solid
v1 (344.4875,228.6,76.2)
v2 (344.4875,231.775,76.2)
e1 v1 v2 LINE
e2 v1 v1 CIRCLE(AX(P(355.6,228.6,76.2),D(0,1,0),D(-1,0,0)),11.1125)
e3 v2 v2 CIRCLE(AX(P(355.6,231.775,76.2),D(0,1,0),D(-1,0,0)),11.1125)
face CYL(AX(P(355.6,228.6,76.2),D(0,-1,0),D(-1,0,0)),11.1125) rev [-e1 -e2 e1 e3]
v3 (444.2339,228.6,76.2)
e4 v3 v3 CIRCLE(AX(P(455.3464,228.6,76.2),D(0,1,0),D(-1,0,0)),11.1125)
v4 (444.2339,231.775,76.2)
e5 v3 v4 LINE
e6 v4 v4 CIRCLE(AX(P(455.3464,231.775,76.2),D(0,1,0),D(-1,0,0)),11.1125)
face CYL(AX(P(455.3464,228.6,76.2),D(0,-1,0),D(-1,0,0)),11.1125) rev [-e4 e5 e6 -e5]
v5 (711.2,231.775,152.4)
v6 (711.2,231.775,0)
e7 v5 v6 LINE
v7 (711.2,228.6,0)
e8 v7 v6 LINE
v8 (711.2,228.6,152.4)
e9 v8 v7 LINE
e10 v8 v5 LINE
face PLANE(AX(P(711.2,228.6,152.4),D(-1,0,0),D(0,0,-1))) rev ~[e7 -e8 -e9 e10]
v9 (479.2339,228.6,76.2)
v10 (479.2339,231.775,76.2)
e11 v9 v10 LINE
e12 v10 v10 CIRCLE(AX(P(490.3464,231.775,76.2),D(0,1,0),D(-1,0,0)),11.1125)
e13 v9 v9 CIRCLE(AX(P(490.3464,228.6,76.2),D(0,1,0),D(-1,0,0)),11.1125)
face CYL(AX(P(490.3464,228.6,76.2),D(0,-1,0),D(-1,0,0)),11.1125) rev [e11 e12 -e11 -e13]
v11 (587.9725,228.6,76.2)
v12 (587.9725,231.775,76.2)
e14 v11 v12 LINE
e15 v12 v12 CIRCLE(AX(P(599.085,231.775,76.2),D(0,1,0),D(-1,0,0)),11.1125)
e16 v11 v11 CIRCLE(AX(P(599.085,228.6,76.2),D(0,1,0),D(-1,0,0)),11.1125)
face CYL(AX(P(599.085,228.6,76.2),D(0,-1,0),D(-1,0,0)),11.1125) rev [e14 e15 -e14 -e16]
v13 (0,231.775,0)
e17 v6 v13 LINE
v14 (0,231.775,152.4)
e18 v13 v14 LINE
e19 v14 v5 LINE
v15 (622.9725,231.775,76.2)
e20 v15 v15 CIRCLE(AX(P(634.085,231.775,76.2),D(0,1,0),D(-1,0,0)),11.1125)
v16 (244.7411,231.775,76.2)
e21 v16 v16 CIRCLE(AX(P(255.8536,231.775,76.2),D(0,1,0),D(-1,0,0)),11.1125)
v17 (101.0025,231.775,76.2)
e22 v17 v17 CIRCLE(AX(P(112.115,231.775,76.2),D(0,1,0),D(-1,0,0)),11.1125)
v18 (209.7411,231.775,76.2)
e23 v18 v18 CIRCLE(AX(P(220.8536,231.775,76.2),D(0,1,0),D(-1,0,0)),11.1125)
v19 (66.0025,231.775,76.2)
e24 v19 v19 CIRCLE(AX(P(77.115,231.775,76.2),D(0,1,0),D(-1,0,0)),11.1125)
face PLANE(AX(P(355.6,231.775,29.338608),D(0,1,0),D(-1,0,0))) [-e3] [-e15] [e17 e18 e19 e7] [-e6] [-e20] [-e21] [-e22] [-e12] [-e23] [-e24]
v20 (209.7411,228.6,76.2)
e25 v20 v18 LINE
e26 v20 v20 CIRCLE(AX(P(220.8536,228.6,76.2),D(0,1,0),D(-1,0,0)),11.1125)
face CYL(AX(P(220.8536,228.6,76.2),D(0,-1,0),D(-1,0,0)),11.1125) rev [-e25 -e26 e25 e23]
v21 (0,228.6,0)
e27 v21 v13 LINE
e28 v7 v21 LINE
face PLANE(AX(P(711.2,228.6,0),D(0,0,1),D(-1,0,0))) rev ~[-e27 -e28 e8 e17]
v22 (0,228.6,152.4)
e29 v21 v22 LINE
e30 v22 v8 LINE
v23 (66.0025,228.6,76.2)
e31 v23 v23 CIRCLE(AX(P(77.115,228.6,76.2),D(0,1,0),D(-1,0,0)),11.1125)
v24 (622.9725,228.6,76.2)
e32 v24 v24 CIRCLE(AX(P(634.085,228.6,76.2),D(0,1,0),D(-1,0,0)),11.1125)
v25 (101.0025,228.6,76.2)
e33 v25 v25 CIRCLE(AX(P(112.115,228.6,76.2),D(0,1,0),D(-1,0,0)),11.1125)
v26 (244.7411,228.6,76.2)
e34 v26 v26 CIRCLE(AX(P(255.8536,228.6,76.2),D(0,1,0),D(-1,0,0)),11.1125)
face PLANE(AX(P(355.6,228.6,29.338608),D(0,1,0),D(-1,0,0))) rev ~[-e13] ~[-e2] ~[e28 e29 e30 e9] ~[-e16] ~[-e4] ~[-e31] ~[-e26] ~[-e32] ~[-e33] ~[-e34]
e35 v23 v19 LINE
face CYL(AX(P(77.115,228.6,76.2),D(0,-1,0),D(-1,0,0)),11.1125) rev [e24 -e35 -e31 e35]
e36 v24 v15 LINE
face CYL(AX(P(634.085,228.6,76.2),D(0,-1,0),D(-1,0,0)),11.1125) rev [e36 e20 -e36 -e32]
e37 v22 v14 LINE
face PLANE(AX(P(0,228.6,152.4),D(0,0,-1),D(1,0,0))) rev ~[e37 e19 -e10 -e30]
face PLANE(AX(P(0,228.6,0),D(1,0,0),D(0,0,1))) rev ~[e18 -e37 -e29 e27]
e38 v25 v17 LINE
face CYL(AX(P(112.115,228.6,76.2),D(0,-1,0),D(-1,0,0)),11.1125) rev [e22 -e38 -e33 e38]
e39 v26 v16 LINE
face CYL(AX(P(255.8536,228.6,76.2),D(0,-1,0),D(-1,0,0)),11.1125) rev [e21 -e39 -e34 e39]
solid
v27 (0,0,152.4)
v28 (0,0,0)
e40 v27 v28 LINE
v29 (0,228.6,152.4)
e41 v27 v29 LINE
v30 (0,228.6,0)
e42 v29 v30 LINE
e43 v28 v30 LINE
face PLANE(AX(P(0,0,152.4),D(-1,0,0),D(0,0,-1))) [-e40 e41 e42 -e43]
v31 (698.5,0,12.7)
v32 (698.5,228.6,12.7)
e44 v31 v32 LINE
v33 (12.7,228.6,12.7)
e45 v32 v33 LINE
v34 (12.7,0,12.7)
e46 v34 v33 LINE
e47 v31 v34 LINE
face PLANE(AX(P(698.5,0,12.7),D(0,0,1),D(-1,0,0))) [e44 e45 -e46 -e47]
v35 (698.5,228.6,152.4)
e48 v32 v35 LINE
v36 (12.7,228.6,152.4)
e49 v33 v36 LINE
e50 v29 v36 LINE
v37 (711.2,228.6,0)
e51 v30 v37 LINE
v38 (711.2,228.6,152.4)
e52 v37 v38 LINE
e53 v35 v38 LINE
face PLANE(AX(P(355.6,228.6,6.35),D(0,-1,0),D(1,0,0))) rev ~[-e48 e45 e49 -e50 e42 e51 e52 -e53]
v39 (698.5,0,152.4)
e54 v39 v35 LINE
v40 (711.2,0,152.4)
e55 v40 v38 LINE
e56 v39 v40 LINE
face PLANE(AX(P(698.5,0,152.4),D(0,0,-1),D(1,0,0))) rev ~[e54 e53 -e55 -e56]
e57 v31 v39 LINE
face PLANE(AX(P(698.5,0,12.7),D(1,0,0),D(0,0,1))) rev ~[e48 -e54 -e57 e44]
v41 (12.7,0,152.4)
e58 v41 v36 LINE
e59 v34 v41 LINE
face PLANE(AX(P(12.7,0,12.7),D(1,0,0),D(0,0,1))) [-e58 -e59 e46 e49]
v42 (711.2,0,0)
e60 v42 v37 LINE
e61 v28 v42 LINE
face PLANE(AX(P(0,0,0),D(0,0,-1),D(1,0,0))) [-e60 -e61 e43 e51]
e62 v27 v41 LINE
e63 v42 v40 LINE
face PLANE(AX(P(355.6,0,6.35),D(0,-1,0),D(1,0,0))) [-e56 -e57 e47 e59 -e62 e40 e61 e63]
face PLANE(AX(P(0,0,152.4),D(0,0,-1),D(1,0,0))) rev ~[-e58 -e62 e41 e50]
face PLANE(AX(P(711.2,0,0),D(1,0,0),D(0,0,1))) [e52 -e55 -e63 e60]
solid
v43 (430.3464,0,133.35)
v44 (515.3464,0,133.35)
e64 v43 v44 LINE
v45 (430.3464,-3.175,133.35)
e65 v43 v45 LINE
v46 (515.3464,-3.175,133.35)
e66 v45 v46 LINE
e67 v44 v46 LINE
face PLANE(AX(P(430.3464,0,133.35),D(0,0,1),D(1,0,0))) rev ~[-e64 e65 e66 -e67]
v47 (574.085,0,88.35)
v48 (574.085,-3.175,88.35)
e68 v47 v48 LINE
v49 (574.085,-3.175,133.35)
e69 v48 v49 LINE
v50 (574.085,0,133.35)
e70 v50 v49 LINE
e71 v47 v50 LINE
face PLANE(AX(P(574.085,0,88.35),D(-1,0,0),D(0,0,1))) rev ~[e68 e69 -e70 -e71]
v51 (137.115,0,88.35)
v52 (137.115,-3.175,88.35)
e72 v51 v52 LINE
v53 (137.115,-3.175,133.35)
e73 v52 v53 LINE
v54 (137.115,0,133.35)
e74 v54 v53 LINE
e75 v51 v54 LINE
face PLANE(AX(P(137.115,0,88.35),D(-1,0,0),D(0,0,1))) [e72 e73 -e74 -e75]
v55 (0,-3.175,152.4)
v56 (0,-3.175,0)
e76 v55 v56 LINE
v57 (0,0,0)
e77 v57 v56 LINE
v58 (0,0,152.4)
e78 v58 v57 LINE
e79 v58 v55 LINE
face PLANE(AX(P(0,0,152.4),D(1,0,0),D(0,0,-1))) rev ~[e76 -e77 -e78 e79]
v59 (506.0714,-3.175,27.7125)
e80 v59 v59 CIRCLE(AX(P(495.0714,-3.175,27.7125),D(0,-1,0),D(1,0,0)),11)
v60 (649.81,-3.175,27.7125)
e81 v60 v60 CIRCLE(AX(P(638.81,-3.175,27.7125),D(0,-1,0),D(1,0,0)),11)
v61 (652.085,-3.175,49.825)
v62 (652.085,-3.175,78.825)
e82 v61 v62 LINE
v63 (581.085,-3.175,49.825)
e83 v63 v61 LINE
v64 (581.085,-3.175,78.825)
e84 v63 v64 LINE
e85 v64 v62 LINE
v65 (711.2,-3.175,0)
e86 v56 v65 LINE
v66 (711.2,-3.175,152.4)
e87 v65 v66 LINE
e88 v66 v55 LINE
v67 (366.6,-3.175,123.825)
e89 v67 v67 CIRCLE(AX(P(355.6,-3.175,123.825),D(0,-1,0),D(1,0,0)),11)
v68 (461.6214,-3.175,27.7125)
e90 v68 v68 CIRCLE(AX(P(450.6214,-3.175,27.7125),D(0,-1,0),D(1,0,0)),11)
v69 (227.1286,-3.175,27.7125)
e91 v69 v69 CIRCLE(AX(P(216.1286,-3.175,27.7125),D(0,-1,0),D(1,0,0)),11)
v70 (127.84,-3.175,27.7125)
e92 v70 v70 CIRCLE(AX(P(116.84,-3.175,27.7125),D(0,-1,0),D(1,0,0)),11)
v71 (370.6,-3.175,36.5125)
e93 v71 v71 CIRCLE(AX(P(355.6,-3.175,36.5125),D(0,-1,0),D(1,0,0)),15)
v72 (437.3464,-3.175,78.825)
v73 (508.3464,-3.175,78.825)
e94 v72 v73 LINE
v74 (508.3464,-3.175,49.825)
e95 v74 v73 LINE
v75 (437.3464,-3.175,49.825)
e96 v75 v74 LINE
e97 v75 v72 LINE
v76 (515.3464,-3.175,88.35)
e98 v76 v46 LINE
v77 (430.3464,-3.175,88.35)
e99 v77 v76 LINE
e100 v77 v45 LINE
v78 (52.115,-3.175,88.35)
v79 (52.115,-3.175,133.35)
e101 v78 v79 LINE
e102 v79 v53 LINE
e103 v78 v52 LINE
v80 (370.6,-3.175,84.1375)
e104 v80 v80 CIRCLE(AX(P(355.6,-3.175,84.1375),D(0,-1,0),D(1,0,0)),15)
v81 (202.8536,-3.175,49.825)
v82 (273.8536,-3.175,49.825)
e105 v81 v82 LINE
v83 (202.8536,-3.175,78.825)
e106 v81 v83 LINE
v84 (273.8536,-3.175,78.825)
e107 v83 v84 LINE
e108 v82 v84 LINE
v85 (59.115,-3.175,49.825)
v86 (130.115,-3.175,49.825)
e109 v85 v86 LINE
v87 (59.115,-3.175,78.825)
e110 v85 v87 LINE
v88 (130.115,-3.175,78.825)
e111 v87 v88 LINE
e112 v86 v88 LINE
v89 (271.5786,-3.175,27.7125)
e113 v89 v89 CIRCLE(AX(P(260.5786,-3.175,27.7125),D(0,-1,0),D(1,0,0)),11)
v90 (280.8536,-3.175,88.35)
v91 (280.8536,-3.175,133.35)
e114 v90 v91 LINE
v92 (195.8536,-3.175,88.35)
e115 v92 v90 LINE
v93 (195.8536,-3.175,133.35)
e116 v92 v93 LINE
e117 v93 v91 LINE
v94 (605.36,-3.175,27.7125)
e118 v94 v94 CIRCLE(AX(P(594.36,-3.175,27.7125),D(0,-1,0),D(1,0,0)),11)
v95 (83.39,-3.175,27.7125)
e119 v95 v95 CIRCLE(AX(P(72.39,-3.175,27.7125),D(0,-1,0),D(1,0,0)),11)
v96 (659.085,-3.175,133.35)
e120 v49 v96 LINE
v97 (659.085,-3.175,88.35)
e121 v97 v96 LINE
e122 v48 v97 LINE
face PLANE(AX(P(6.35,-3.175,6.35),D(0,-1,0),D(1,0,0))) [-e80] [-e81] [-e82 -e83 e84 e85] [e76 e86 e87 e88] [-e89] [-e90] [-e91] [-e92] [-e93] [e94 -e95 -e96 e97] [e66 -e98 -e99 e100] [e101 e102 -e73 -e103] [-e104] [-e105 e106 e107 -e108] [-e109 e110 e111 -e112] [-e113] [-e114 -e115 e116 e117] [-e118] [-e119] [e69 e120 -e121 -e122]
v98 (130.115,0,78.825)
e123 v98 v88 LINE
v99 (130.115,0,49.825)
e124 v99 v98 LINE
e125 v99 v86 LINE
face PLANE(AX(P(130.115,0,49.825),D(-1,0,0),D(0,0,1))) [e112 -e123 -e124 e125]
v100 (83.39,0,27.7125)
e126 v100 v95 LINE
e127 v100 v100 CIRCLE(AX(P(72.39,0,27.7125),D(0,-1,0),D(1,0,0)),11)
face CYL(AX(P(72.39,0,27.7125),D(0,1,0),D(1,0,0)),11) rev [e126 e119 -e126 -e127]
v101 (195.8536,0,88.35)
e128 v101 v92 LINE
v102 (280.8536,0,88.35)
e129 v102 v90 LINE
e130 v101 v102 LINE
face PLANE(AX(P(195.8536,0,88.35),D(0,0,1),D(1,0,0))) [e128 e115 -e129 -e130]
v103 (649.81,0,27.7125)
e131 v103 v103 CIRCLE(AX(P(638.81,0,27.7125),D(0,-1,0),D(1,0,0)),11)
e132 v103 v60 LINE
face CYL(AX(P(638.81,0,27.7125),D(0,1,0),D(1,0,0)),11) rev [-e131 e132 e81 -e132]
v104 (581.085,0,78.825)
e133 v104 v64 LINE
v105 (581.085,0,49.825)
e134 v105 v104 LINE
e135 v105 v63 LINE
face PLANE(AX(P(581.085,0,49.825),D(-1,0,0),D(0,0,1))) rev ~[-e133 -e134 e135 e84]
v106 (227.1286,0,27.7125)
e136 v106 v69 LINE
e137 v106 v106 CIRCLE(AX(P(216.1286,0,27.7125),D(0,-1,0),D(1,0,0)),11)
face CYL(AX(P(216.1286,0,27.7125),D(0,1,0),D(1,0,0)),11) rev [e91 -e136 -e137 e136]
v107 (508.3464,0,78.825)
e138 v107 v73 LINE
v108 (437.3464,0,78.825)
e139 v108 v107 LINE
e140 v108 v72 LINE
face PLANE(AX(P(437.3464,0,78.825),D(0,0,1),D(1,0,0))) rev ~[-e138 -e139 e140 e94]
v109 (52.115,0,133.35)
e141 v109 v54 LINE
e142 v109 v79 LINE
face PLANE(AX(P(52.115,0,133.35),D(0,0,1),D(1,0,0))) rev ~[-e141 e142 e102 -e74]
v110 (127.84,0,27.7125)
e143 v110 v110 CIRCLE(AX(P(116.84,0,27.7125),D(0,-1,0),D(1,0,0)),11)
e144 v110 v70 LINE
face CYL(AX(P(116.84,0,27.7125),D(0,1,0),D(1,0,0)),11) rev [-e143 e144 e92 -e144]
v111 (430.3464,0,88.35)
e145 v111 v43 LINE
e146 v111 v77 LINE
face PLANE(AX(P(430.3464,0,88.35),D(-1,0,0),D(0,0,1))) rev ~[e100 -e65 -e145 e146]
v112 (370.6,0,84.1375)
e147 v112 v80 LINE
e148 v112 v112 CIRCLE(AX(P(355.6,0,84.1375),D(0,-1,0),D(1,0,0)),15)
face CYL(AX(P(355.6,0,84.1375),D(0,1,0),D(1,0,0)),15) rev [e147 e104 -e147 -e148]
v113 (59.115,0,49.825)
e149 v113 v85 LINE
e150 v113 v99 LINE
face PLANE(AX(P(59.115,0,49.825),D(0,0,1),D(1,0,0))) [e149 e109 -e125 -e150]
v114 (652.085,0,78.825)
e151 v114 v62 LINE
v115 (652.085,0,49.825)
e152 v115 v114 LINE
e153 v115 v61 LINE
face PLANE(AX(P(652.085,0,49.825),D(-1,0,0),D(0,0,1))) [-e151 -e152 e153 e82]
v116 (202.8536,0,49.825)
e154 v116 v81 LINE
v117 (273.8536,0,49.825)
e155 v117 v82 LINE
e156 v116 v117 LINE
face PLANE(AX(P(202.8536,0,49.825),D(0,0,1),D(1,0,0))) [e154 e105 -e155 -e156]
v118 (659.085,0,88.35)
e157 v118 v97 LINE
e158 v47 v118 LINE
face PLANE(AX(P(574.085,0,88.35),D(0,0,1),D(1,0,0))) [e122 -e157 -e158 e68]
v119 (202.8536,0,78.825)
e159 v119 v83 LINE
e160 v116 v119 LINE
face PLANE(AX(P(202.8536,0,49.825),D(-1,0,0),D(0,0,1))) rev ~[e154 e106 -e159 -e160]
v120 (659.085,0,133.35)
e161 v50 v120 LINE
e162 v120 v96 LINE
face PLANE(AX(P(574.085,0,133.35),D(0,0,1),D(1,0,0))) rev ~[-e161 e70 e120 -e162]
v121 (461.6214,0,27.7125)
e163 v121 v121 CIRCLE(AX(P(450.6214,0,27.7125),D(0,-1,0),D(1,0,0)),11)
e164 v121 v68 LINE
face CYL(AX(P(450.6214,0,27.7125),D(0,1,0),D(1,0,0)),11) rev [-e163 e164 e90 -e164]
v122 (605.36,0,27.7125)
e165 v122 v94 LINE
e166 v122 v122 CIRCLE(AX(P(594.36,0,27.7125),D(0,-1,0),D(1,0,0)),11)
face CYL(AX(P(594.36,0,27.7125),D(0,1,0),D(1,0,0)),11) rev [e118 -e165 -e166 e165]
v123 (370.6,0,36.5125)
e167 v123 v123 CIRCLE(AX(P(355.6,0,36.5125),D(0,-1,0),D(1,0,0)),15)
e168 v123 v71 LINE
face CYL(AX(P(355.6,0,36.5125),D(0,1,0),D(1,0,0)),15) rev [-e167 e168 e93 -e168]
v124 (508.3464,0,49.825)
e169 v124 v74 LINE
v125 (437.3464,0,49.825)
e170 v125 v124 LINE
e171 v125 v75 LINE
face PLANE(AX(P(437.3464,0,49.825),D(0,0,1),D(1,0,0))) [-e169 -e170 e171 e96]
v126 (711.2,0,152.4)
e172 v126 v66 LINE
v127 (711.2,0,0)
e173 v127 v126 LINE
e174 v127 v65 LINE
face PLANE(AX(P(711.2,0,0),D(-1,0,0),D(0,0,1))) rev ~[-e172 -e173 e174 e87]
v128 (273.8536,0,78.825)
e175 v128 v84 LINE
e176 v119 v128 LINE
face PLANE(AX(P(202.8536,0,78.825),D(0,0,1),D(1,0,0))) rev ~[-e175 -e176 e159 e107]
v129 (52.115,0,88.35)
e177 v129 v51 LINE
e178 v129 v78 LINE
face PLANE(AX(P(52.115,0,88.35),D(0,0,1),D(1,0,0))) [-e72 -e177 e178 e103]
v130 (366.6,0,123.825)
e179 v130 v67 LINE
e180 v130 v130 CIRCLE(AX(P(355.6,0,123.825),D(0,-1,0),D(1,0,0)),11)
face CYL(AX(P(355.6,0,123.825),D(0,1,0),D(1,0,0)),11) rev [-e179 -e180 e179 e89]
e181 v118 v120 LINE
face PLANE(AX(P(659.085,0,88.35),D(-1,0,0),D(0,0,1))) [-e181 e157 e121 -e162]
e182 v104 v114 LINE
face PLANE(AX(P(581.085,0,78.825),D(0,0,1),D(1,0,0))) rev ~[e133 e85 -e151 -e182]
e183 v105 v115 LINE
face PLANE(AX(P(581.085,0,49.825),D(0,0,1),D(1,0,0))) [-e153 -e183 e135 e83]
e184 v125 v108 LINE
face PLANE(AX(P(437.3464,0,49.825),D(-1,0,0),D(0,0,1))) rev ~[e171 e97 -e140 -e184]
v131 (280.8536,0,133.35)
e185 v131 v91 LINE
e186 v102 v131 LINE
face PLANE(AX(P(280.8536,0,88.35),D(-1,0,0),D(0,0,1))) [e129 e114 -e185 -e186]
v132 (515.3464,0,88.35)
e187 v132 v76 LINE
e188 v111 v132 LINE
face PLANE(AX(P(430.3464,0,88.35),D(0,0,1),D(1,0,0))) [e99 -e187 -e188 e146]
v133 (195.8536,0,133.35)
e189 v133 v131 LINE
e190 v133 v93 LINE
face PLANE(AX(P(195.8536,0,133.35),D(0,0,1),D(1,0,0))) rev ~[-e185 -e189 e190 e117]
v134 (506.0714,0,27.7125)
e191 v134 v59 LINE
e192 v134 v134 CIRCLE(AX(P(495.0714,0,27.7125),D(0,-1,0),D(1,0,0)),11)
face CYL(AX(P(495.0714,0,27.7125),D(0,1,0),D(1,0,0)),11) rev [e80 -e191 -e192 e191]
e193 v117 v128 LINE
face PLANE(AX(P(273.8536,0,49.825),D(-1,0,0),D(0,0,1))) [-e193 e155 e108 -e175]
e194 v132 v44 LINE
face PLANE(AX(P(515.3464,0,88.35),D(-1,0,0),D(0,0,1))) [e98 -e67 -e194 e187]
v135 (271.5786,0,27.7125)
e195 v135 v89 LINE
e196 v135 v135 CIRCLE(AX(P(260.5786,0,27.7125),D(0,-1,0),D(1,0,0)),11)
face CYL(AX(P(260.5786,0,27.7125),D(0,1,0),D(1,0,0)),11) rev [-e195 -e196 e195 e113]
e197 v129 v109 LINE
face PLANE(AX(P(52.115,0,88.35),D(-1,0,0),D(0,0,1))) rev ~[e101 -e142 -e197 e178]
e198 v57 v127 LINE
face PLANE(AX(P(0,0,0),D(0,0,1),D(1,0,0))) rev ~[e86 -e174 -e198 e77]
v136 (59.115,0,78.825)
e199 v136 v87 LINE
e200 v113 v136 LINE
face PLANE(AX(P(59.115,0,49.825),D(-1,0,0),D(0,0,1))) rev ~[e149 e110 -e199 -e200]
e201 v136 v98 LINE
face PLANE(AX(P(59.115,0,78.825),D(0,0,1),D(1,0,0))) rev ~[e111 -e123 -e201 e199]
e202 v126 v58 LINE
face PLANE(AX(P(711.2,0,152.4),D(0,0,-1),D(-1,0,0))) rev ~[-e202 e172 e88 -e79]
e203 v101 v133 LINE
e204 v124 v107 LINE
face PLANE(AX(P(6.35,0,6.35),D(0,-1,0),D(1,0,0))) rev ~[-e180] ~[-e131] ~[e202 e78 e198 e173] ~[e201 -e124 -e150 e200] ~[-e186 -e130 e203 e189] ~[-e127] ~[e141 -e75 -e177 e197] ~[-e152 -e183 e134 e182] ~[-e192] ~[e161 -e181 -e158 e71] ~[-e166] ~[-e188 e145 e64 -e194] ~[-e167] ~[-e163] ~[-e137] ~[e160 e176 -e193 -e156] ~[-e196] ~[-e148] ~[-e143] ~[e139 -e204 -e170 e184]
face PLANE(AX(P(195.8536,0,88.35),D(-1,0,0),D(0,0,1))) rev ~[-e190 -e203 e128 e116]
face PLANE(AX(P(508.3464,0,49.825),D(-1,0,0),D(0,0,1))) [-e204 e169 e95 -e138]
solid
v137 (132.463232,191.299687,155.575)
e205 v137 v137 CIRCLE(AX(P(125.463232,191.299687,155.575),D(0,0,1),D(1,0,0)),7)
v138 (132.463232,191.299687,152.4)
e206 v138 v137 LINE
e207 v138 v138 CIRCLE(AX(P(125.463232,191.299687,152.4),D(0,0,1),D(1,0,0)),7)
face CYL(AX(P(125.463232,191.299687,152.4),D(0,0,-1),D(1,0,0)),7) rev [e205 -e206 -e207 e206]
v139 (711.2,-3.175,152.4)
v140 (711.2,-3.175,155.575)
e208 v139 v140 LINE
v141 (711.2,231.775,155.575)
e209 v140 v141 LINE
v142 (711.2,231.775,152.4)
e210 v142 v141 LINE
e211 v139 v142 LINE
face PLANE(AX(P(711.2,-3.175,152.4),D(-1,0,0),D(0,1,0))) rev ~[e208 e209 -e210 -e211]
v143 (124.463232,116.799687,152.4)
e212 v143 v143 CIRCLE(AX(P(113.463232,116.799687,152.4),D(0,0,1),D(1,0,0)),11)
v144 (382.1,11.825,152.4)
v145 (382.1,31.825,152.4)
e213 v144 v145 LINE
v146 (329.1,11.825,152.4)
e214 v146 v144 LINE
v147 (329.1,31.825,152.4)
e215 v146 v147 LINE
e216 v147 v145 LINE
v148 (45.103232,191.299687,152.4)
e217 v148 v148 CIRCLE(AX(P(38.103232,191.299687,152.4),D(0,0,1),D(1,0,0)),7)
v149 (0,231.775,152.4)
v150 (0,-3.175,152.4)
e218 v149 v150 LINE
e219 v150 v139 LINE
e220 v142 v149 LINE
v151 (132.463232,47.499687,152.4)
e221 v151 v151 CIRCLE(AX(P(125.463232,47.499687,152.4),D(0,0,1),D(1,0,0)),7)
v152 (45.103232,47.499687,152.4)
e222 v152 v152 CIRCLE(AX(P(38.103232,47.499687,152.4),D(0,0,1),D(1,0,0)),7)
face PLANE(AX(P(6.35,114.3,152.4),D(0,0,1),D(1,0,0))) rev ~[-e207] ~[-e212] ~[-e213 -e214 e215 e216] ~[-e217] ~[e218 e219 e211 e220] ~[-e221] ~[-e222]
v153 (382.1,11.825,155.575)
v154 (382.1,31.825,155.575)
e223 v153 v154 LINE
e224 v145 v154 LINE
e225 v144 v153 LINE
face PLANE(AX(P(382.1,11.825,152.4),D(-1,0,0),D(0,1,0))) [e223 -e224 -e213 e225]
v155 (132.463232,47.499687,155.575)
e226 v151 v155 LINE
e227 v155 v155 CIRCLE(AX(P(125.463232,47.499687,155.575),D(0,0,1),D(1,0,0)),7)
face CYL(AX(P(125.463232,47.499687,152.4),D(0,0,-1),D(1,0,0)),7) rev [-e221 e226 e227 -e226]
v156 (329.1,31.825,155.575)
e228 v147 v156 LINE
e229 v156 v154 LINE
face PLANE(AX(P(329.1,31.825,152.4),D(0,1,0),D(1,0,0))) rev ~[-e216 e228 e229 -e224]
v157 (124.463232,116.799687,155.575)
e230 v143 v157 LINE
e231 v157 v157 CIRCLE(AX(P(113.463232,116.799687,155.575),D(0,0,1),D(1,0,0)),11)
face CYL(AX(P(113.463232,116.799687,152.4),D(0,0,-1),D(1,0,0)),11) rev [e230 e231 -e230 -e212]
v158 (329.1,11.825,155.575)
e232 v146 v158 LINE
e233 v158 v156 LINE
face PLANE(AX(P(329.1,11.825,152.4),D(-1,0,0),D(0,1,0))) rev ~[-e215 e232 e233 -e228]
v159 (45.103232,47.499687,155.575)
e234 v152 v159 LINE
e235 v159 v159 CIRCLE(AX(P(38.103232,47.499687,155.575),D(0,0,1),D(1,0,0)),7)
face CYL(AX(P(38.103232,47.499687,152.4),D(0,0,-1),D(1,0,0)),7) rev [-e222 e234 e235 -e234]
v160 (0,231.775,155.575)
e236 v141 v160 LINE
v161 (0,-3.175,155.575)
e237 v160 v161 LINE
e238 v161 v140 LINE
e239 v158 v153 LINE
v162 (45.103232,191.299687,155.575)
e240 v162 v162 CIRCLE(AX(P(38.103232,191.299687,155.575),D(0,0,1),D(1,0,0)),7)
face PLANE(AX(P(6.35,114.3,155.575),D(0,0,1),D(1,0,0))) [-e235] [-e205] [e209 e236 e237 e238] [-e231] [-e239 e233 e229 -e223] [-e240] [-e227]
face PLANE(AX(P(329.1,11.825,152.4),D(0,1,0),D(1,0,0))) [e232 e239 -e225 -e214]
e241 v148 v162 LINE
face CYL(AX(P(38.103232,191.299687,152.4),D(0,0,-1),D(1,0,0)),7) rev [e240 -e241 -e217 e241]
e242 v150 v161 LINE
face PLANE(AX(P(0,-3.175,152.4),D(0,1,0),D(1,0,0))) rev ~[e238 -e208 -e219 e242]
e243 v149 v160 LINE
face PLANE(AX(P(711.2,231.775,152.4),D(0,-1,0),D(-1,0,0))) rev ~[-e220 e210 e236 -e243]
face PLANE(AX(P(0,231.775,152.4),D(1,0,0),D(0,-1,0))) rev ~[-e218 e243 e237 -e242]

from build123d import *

# Parameters (mm, degrees)
F0_W     = 12.7
F0_H     = 12.7
F0_W_2   = 685.8
F0_H_2   = 139.7
F0_R     = 11
F0_W_3   = 71
F0_H_3   = 29
F0_R_2   = 15
F0_W_4   = 85
F0_H_4   = 45
F1_DEPTH = 3.175
F2_DEPTH = 228.6
F3_W     = 685.8
F3_H     = 139.7
F3_R     = 11.1125
F4_DEPTH = 3.175
F5_W     = 12.7
F5_H     = 228.6
F5_R     = 7
F5_W_2   = 53
F5_H_2   = 20
F5_R_2   = 11
F6_DEPTH = 3.175


# Not quite as in the source:
# - a feature names something its author has since deleted; it is built from what else it names


with BuildPart() as f1:
    # F0 (on Front) → F1 (new body)
    with BuildSketch(Plane.XZ):
        with Locations((6.35, 6.35)):
            Rectangle(F0_W, F0_H)
        with Locations((355.6, 6.35)):
            Rectangle(F0_W_2, F0_H)
        with Locations((704.85, 6.35)):
            Rectangle(F0_W, F0_H)
        with Locations((6.35, 82.55)):
            Rectangle(F0_W, F0_H_2)
        with Locations((355.6, 82.55)):
            Rectangle(F0_W_2, F0_H_2)
        with Locations((72.39, 27.7125)):
            Circle(F0_R, mode=Mode.SUBTRACT)
        with Locations((116.84, 27.7125)):
            Circle(F0_R, mode=Mode.SUBTRACT)
        with Locations((216.1286, 27.7125)):
            Circle(F0_R, mode=Mode.SUBTRACT)
        with Locations((260.5786, 27.7125)):
            Circle(F0_R, mode=Mode.SUBTRACT)
        with Locations((94.615, 64.325)):
            Rectangle(F0_W_3, F0_H_3, mode=Mode.SUBTRACT)
        with Locations((238.3536, 64.325)):
            Rectangle(F0_W_3, F0_H_3, mode=Mode.SUBTRACT)
        with Locations((355.6, 36.5125)):
            Circle(F0_R_2, mode=Mode.SUBTRACT)
        with Locations((450.6214, 27.7125)):
            Circle(F0_R, mode=Mode.SUBTRACT)
        with Locations((495.0714, 27.7125)):
            Circle(F0_R, mode=Mode.SUBTRACT)
        with Locations((594.36, 27.7125)):
            Circle(F0_R, mode=Mode.SUBTRACT)
        with Locations((638.81, 27.7125)):
            Circle(F0_R, mode=Mode.SUBTRACT)
        with Locations((472.8464, 64.325)):
            Rectangle(F0_W_3, F0_H_3, mode=Mode.SUBTRACT)
        with Locations((616.585, 64.325)):
            Rectangle(F0_W_3, F0_H_3, mode=Mode.SUBTRACT)
        with Locations((94.615, 110.85)):
            Rectangle(F0_W_4, F0_H_4, mode=Mode.SUBTRACT)
        with Locations((238.3536, 110.85)):
            Rectangle(F0_W_4, F0_H_4, mode=Mode.SUBTRACT)
        with Locations((355.6, 84.1375)):
            Circle(F0_R_2, mode=Mode.SUBTRACT)
        with Locations((472.8464, 110.85)):
            Rectangle(F0_W_4, F0_H_4, mode=Mode.SUBTRACT)
        with Locations((616.585, 110.85)):
            Rectangle(F0_W_4, F0_H_4, mode=Mode.SUBTRACT)
        with Locations((355.6, 123.825)):
            Circle(F0_R, mode=Mode.SUBTRACT)
        with Locations((704.85, 82.55)):
            Rectangle(F0_W, F0_H_2)
    extrude(amount=F1_DEPTH)


with BuildPart() as f2:
    # F0 (on Front) → F2 (new body)
    with BuildSketch(Plane.XZ):
        with Locations((355.6, 6.35)):
            Rectangle(F0_W_2, F0_H)
        with Locations((6.35, 6.35)):
            Rectangle(F0_W, F0_H)
        with Locations((704.85, 6.35)):
            Rectangle(F0_W, F0_H)
        with Locations((6.35, 82.55)):
            Rectangle(F0_W, F0_H_2)
        with Locations((704.85, 82.55)):
            Rectangle(F0_W, F0_H_2)
    extrude(amount=-F2_DEPTH)


with BuildPart() as f4:
    # F3 (on face) → F4 (new body)
    with BuildSketch(Plane(origin=(0, 228.6, 0), x_dir=(-1, 0, 0), z_dir=(0, 1, 0))):
        Polygon((-711.2, 152.4), (-711.2, 0), (0, 0), (0, 152.4), (-12.7, 152.4), (-12.7, 12.7), (-698.5, 12.7), (-698.5, 152.4), align=None)
        with Locations((-355.6, 82.55)):
            Rectangle(F3_W, F3_H)
        with Locations((-634.085, 76.2)):
            Circle(F3_R, mode=Mode.SUBTRACT)
        with Locations((-599.085, 76.2)):
            Circle(F3_R, mode=Mode.SUBTRACT)
        with Locations((-490.3464, 76.2)):
            Circle(F3_R, mode=Mode.SUBTRACT)
        with Locations((-455.3464, 76.2)):
            Circle(F3_R, mode=Mode.SUBTRACT)
        with Locations((-355.6, 76.2)):
            Circle(F3_R, mode=Mode.SUBTRACT)
        with Locations((-255.8536, 76.2)):
            Circle(F3_R, mode=Mode.SUBTRACT)
        with Locations((-220.8536, 76.2)):
            Circle(F3_R, mode=Mode.SUBTRACT)
        with Locations((-112.115, 76.2)):
            Circle(F3_R, mode=Mode.SUBTRACT)
        with Locations((-77.115, 76.2)):
            Circle(F3_R, mode=Mode.SUBTRACT)
    extrude(amount=F4_DEPTH)


with BuildPart() as f6:
    # F5 (on face) → F6 (new body)
    with BuildSketch(Plane.XY.offset(152.4)):
        with Locations((6.35, 114.3)):
            Rectangle(F5_W, F5_H)
        Polygon((12.7, 0), (0, 0), (0, -3.175), (711.2, -3.175), (711.2, 0), (711.2, 228.6), (711.2, 231.775), (0, 231.775), (0, 228.6), (12.7, 228.6), align=None)
        with Locations((38.1032319846, 47.4996870108)):
            Circle(F5_R, mode=Mode.SUBTRACT)
        with Locations((125.4632319846, 47.4996870108)):
            Circle(F5_R, mode=Mode.SUBTRACT)
        with Locations((355.6, 21.825)):
            Rectangle(F5_W_2, F5_H_2, mode=Mode.SUBTRACT)
        with Locations((113.4632319846, 116.7996870108)):
            Circle(F5_R_2, mode=Mode.SUBTRACT)
        with Locations((38.1032319846, 191.2996870108)):
            Circle(F5_R, mode=Mode.SUBTRACT)
        with Locations((125.4632319846, 191.2996870108)):
            Circle(F5_R, mode=Mode.SUBTRACT)
    extrude(amount=F6_DEPTH)


solid = Compound([f1.part, f2.part, f4.part, f6.part])
